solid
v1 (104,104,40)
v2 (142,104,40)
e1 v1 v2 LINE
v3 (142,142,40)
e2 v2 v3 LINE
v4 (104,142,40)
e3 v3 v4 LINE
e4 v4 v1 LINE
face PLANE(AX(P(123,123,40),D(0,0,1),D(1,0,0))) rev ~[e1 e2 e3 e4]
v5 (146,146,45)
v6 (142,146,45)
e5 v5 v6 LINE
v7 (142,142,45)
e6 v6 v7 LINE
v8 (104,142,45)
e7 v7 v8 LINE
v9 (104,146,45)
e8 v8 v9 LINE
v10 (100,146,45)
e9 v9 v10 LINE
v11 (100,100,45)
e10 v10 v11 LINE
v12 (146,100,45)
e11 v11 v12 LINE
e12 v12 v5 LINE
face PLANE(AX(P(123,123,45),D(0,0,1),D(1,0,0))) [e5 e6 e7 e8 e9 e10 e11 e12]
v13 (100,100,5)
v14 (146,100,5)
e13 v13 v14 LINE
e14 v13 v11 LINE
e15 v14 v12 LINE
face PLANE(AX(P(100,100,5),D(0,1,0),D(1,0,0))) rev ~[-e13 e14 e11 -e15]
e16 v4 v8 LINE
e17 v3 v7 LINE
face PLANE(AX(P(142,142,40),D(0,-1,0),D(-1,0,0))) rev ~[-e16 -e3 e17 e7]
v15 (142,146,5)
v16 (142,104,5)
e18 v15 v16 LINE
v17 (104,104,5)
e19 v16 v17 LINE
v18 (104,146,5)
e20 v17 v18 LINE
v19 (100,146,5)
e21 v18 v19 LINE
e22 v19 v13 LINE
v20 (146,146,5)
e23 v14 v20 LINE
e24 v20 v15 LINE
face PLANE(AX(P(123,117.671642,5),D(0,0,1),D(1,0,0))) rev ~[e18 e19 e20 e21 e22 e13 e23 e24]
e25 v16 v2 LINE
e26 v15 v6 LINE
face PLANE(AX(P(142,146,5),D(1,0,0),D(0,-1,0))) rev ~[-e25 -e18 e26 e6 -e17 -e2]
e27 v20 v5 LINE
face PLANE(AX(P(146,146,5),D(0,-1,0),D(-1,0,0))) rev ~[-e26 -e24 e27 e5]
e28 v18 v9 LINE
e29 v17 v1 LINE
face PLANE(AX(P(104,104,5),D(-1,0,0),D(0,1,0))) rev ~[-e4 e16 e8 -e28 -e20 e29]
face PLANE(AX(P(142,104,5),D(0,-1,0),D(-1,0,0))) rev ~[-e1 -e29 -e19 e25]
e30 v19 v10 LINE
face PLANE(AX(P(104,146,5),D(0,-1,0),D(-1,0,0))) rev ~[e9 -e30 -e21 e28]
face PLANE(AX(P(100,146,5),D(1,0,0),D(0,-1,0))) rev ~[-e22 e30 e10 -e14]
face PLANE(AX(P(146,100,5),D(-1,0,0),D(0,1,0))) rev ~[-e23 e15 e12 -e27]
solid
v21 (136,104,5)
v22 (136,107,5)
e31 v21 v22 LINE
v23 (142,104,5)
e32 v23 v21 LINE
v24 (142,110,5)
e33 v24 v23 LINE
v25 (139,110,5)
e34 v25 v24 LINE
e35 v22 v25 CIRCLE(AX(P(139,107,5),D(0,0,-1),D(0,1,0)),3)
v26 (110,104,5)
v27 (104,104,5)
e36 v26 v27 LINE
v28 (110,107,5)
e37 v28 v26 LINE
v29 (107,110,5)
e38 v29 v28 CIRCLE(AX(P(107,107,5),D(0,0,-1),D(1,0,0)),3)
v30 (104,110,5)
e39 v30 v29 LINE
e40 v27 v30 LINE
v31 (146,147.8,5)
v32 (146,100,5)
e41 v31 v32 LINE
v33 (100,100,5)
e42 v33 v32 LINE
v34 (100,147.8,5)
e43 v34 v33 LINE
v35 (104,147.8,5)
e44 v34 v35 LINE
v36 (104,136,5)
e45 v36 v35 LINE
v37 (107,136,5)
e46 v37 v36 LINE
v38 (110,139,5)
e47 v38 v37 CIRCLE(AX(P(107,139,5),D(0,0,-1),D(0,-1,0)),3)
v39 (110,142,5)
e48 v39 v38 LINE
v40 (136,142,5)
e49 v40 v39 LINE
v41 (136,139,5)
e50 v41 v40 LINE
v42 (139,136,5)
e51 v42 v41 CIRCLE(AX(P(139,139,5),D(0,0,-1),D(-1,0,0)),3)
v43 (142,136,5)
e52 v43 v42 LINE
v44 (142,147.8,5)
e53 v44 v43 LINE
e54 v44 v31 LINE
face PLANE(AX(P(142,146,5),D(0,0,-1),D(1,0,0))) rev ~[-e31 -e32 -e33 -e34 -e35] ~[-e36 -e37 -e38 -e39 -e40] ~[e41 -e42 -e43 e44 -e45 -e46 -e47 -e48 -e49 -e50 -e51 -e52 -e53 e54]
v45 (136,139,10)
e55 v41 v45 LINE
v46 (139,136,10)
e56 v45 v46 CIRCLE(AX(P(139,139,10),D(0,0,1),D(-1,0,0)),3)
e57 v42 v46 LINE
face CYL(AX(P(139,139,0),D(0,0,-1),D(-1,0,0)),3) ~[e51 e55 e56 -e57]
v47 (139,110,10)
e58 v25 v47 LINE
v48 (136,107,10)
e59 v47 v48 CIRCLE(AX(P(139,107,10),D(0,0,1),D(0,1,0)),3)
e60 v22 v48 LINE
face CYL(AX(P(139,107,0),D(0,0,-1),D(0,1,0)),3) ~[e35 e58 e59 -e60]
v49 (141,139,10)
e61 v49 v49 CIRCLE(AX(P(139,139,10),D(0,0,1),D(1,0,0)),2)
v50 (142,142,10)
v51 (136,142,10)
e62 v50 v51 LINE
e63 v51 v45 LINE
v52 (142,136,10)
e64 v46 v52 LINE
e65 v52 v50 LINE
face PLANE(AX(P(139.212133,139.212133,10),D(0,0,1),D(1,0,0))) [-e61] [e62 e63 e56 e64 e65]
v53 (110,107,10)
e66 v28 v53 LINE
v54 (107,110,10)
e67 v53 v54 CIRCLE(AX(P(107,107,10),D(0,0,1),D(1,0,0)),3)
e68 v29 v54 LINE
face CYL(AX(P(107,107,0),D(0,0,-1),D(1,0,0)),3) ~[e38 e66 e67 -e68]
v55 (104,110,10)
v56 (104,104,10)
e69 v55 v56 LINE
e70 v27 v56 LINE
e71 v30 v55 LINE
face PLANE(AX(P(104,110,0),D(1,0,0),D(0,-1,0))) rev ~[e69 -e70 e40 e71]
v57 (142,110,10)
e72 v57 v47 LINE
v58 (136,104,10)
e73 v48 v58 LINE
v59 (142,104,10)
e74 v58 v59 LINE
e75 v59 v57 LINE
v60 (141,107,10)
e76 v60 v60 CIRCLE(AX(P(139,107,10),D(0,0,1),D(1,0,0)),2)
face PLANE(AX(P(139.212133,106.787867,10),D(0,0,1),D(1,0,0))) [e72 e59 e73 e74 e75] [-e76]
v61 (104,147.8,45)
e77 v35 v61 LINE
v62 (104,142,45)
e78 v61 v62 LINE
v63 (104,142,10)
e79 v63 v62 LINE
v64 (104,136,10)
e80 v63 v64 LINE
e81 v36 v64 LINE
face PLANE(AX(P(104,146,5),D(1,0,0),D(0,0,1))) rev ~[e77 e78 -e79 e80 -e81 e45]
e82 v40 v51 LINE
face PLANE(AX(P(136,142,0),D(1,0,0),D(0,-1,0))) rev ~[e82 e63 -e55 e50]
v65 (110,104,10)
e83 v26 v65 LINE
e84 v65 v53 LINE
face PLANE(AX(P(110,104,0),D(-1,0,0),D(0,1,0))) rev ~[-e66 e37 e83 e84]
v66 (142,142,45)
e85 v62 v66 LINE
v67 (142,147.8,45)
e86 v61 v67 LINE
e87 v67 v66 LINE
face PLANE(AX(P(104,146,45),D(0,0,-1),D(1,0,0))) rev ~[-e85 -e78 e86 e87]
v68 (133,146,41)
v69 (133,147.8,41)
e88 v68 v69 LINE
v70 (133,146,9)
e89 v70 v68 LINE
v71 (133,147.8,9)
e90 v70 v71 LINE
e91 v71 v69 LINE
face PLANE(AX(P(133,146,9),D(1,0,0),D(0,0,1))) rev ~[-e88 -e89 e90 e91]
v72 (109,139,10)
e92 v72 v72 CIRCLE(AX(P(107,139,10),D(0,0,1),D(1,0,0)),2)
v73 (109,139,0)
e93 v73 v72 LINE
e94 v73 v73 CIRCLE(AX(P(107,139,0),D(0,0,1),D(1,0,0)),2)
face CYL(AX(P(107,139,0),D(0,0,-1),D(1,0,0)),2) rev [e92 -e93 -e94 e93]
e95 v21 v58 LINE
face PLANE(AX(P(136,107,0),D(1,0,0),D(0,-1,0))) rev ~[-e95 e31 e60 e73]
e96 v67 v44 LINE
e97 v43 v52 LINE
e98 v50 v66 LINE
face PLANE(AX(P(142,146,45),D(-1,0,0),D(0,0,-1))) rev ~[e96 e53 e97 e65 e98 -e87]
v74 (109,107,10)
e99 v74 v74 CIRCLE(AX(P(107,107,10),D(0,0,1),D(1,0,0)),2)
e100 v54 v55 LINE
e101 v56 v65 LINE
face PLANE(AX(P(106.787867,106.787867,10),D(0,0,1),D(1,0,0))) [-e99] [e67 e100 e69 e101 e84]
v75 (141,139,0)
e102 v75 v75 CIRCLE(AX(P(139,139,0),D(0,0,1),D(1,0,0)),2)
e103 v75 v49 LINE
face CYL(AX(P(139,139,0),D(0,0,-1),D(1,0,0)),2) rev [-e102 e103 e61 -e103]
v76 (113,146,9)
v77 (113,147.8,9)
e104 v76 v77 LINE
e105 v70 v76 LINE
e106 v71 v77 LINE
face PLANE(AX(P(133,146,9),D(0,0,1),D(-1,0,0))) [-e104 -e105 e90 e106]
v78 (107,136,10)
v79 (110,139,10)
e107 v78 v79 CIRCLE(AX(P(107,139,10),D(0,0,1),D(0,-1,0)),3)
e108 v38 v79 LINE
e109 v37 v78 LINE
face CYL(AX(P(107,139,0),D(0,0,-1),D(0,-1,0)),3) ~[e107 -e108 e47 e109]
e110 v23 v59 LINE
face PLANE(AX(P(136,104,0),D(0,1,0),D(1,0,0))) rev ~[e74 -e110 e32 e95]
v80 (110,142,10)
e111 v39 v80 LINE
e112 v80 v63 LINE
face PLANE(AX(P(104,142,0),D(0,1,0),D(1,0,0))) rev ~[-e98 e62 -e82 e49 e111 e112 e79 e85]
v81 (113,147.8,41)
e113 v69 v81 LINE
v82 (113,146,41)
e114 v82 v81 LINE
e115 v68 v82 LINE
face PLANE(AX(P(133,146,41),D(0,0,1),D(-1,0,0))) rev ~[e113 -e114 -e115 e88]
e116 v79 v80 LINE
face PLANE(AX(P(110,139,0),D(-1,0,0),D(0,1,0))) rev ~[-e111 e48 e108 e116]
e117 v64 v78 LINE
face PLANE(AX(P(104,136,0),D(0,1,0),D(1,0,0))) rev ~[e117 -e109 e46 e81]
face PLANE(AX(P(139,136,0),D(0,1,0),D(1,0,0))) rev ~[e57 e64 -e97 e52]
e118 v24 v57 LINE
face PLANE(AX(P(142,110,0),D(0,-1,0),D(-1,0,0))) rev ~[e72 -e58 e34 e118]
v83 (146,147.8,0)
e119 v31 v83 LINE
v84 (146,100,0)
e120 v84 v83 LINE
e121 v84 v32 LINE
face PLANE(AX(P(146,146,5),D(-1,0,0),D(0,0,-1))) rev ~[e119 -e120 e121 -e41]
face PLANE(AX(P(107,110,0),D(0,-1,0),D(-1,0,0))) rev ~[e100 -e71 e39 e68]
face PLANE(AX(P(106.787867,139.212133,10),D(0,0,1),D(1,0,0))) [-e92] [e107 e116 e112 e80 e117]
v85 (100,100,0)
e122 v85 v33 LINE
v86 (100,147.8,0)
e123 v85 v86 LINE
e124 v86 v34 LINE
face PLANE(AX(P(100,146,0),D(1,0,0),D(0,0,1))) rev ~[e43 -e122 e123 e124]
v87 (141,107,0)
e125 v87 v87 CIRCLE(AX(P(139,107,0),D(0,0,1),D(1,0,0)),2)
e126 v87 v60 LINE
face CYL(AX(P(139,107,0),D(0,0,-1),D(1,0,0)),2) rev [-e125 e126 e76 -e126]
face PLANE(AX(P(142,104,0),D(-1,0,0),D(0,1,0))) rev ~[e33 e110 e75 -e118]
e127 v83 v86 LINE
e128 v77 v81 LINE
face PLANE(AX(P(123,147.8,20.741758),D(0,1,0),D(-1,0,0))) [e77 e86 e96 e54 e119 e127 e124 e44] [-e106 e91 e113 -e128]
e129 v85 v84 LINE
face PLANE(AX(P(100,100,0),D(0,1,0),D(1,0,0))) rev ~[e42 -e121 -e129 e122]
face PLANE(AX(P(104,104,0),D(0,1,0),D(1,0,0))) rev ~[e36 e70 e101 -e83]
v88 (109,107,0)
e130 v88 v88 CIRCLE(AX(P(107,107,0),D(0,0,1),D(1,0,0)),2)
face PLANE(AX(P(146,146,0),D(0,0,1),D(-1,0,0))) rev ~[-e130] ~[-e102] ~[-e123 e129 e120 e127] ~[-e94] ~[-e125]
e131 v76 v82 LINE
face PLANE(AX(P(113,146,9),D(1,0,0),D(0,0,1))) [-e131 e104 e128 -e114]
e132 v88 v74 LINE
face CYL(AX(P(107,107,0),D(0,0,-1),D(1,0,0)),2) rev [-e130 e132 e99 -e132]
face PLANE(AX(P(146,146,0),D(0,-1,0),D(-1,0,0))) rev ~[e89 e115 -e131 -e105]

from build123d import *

# Parameters (mm, degrees)
F1_R     = 2
F2_DEPTH = 5
F3_DEPTH = 10
F4_DEPTH = 45
F5_START = 5
F5_DEPTH = 40
F6_START = 40
F6_DEPTH = 5
F7_W     = 20
F7_H     = 32
F8_DEPTH = 1.8


with BuildPart() as f2:
    # F1 (on Top) → F2 (new body)
    with BuildSketch(Plane.XY):
        with BuildLine():
            Line((110, 142), (104, 142))
            Line((104, 142), (104, 136))
            Line((104, 136), (107, 136))
            ThreePointArc((107, 136), (109.1213203436, 136.8786796564), (110, 139))
            Line((110, 139), (110, 142))
        make_face()
        with Locations((107, 139)):
            Circle(F1_R, mode=Mode.SUBTRACT)
        with BuildLine():
            Line((136, 142), (110, 142))
            Line((110, 142), (110, 139))
            ThreePointArc((110, 139), (109.1213203436, 136.8786796564), (107, 136))
            Line((107, 136), (104, 136))
            Line((104, 136), (104, 110))
            Line((104, 110), (107, 110))
            ThreePointArc((107, 110), (109.1213203436, 109.1213203436), (110, 107))
            Line((110, 107), (110, 104))
            Line((110, 104), (136, 104))
            Line((136, 104), (136, 107))
            ThreePointArc((136, 107), (136.8786796564, 109.1213203436), (139, 110))
            Line((139, 110), (142, 110))
            Line((142, 110), (142, 136))
            Line((142, 136), (139, 136))
            ThreePointArc((139, 136), (136.8786796564, 136.8786796564), (136, 139))
            Line((136, 139), (136, 142))
        make_face()
        Polygon((100, 146), (100, 100), (146, 100), (146, 146), (142, 146), (142, 142), (142, 136), (142, 110), (142, 104), (136, 104), (110, 104), (104, 104), (104, 110), (104, 136), (104, 142), (104, 146), align=None)
        with BuildLine():
            Line((142, 136), (142, 142))
            Line((142, 142), (136, 142))
            Line((136, 142), (136, 139))
            ThreePointArc((136, 139), (136.8786796564, 136.8786796564), (139, 136))
            Line((139, 136), (142, 136))
        make_face()
        with Locations((139, 139)):
            Circle(F1_R, mode=Mode.SUBTRACT)
        with BuildLine():
            Line((107, 110), (104, 110))
            Line((104, 110), (104, 104))
            Line((104, 104), (110, 104))
            Line((110, 104), (110, 107))
            ThreePointArc((110, 107), (109.1213203436, 109.1213203436), (107, 110))
        make_face()
        with Locations((107, 107)):
            Circle(F1_R, mode=Mode.SUBTRACT)
        with BuildLine():
            Line((142, 104), (142, 110))
            Line((142, 110), (139, 110))
            ThreePointArc((139, 110), (136.8786796564, 109.1213203436), (136, 107))
            Line((136, 107), (136, 104))
            Line((136, 104), (142, 104))
        make_face()
        with Locations((139, 107)):
            Circle(F1_R, mode=Mode.SUBTRACT)
        Polygon((142, 146), (104, 146), (104, 142), (110, 142), (136, 142), (142, 142), align=None)
    extrude(amount=F2_DEPTH)

    # F1 (on Top) → F3 (join)
    with BuildSketch(Plane.XY):
        with BuildLine():
            Line((110, 142), (104, 142))
            Line((104, 142), (104, 136))
            Line((104, 136), (107, 136))
            ThreePointArc((107, 136), (109.1213203436, 136.8786796564), (110, 139))
            Line((110, 139), (110, 142))
        make_face()
        with Locations((107, 139)):
            Circle(F1_R, mode=Mode.SUBTRACT)
        with BuildLine():
            Line((142, 136), (142, 142))
            Line((142, 142), (136, 142))
            Line((136, 142), (136, 139))
            ThreePointArc((136, 139), (136.8786796564, 136.8786796564), (139, 136))
            Line((139, 136), (142, 136))
        make_face()
        with Locations((139, 139)):
            Circle(F1_R, mode=Mode.SUBTRACT)
        with BuildLine():
            Line((107, 110), (104, 110))
            Line((104, 110), (104, 104))
            Line((104, 104), (110, 104))
            Line((110, 104), (110, 107))
            ThreePointArc((110, 107), (109.1213203436, 109.1213203436), (107, 110))
        make_face()
        with Locations((107, 107)):
            Circle(F1_R, mode=Mode.SUBTRACT)
        with BuildLine():
            Line((142, 104), (142, 110))
            Line((142, 110), (139, 110))
            ThreePointArc((139, 110), (136.8786796564, 109.1213203436), (136, 107))
            Line((136, 107), (136, 104))
            Line((136, 104), (142, 104))
        make_face()
        with Locations((139, 107)):
            Circle(F1_R, mode=Mode.SUBTRACT)
    extrude(amount=F3_DEPTH)

    # F1 (on Top) → F4 (join)
    with BuildSketch(Plane.XY):
        Polygon((142, 146), (104, 146), (104, 142), (110, 142), (136, 142), (142, 142), align=None)
    extrude(amount=F4_DEPTH)

    # F7 (on face) → F8 (join)
    with BuildSketch(Plane(origin=(0, 146, 0), x_dir=(-1, 0, 0), z_dir=(0, 1, 0))):
        Polygon((-146, 5), (-146, 0), (-100, 0), (-100, 5), (-104, 5), (-104, 45), (-142, 45), (-142, 5), align=None)
        with Locations((-123, 25)):
            Rectangle(F7_W, F7_H, mode=Mode.SUBTRACT)
    extrude(amount=F8_DEPTH)


with BuildPart() as f5:
    # F1 (on Top) → F5 (new body)
    with BuildSketch(Plane.XY.offset(F5_START)):
        Polygon((100, 146), (100, 100), (146, 100), (146, 146), (142, 146), (142, 142), (142, 136), (142, 110), (142, 104), (136, 104), (110, 104), (104, 104), (104, 110), (104, 136), (104, 142), (104, 146), align=None)
    extrude(amount=F5_DEPTH)

    # F1 (on Top) → F6 (join)
    with BuildSketch(Plane.XY.offset(F6_START)):
        with BuildLine():
            Line((136, 142), (110, 142))
            Line((110, 142), (110, 139))
            ThreePointArc((110, 139), (109.1213203436, 136.8786796564), (107, 136))
            Line((107, 136), (104, 136))
            Line((104, 136), (104, 110))
            Line((104, 110), (107, 110))
            ThreePointArc((107, 110), (109.1213203436, 109.1213203436), (110, 107))
            Line((110, 107), (110, 104))
            Line((110, 104), (136, 104))
            Line((136, 104), (136, 107))
            ThreePointArc((136, 107), (136.8786796564, 109.1213203436), (139, 110))
            Line((139, 110), (142, 110))
            Line((142, 110), (142, 136))
            Line((142, 136), (139, 136))
            ThreePointArc((139, 136), (136.8786796564, 136.8786796564), (136, 139))
            Line((136, 139), (136, 142))
        make_face()
        with BuildLine():
            Line((107, 110), (104, 110))
            Line((104, 110), (104, 104))
            Line((104, 104), (110, 104))
            Line((110, 104), (110, 107))
            ThreePointArc((110, 107), (109.1213203436, 109.1213203436), (107, 110))
        make_face()
        with Locations((107, 107)):
            Circle(F1_R, mode=Mode.SUBTRACT)
        with BuildLine():
            Line((142, 104), (142, 110))
            Line((142, 110), (139, 110))
            ThreePointArc((139, 110), (136.8786796564, 109.1213203436), (136, 107))
            Line((136, 107), (136, 104))
            Line((136, 104), (142, 104))
        make_face()
        with Locations((139, 107)):
            Circle(F1_R, mode=Mode.SUBTRACT)
        with BuildLine():
            Line((142, 136), (142, 142))
            Line((142, 142), (136, 142))
            Line((136, 142), (136, 139))
            ThreePointArc((136, 139), (136.8786796564, 136.8786796564), (139, 136))
            Line((139, 136), (142, 136))
        make_face()
        with Locations((139, 139)):
            Circle(F1_R, mode=Mode.SUBTRACT)
        with BuildLine():
            Line((110, 142), (104, 142))
            Line((104, 142), (104, 136))
            Line((104, 136), (107, 136))
            ThreePointArc((107, 136), (109.1213203436, 136.8786796564), (110, 139))
            Line((110, 139), (110, 142))
        make_face()
        with Locations((107, 139)):
            Circle(F1_R, mode=Mode.SUBTRACT)
        with Locations((107, 107)):
            Circle(F1_R)
        with Locations((139, 107)):
            Circle(F1_R)
        with Locations((107, 139)):
            Circle(F1_R)
        with Locations((139, 139)):
            Circle(F1_R)
    extrude(amount=F6_DEPTH)


solid = Compound([f2.part, f5.part])
